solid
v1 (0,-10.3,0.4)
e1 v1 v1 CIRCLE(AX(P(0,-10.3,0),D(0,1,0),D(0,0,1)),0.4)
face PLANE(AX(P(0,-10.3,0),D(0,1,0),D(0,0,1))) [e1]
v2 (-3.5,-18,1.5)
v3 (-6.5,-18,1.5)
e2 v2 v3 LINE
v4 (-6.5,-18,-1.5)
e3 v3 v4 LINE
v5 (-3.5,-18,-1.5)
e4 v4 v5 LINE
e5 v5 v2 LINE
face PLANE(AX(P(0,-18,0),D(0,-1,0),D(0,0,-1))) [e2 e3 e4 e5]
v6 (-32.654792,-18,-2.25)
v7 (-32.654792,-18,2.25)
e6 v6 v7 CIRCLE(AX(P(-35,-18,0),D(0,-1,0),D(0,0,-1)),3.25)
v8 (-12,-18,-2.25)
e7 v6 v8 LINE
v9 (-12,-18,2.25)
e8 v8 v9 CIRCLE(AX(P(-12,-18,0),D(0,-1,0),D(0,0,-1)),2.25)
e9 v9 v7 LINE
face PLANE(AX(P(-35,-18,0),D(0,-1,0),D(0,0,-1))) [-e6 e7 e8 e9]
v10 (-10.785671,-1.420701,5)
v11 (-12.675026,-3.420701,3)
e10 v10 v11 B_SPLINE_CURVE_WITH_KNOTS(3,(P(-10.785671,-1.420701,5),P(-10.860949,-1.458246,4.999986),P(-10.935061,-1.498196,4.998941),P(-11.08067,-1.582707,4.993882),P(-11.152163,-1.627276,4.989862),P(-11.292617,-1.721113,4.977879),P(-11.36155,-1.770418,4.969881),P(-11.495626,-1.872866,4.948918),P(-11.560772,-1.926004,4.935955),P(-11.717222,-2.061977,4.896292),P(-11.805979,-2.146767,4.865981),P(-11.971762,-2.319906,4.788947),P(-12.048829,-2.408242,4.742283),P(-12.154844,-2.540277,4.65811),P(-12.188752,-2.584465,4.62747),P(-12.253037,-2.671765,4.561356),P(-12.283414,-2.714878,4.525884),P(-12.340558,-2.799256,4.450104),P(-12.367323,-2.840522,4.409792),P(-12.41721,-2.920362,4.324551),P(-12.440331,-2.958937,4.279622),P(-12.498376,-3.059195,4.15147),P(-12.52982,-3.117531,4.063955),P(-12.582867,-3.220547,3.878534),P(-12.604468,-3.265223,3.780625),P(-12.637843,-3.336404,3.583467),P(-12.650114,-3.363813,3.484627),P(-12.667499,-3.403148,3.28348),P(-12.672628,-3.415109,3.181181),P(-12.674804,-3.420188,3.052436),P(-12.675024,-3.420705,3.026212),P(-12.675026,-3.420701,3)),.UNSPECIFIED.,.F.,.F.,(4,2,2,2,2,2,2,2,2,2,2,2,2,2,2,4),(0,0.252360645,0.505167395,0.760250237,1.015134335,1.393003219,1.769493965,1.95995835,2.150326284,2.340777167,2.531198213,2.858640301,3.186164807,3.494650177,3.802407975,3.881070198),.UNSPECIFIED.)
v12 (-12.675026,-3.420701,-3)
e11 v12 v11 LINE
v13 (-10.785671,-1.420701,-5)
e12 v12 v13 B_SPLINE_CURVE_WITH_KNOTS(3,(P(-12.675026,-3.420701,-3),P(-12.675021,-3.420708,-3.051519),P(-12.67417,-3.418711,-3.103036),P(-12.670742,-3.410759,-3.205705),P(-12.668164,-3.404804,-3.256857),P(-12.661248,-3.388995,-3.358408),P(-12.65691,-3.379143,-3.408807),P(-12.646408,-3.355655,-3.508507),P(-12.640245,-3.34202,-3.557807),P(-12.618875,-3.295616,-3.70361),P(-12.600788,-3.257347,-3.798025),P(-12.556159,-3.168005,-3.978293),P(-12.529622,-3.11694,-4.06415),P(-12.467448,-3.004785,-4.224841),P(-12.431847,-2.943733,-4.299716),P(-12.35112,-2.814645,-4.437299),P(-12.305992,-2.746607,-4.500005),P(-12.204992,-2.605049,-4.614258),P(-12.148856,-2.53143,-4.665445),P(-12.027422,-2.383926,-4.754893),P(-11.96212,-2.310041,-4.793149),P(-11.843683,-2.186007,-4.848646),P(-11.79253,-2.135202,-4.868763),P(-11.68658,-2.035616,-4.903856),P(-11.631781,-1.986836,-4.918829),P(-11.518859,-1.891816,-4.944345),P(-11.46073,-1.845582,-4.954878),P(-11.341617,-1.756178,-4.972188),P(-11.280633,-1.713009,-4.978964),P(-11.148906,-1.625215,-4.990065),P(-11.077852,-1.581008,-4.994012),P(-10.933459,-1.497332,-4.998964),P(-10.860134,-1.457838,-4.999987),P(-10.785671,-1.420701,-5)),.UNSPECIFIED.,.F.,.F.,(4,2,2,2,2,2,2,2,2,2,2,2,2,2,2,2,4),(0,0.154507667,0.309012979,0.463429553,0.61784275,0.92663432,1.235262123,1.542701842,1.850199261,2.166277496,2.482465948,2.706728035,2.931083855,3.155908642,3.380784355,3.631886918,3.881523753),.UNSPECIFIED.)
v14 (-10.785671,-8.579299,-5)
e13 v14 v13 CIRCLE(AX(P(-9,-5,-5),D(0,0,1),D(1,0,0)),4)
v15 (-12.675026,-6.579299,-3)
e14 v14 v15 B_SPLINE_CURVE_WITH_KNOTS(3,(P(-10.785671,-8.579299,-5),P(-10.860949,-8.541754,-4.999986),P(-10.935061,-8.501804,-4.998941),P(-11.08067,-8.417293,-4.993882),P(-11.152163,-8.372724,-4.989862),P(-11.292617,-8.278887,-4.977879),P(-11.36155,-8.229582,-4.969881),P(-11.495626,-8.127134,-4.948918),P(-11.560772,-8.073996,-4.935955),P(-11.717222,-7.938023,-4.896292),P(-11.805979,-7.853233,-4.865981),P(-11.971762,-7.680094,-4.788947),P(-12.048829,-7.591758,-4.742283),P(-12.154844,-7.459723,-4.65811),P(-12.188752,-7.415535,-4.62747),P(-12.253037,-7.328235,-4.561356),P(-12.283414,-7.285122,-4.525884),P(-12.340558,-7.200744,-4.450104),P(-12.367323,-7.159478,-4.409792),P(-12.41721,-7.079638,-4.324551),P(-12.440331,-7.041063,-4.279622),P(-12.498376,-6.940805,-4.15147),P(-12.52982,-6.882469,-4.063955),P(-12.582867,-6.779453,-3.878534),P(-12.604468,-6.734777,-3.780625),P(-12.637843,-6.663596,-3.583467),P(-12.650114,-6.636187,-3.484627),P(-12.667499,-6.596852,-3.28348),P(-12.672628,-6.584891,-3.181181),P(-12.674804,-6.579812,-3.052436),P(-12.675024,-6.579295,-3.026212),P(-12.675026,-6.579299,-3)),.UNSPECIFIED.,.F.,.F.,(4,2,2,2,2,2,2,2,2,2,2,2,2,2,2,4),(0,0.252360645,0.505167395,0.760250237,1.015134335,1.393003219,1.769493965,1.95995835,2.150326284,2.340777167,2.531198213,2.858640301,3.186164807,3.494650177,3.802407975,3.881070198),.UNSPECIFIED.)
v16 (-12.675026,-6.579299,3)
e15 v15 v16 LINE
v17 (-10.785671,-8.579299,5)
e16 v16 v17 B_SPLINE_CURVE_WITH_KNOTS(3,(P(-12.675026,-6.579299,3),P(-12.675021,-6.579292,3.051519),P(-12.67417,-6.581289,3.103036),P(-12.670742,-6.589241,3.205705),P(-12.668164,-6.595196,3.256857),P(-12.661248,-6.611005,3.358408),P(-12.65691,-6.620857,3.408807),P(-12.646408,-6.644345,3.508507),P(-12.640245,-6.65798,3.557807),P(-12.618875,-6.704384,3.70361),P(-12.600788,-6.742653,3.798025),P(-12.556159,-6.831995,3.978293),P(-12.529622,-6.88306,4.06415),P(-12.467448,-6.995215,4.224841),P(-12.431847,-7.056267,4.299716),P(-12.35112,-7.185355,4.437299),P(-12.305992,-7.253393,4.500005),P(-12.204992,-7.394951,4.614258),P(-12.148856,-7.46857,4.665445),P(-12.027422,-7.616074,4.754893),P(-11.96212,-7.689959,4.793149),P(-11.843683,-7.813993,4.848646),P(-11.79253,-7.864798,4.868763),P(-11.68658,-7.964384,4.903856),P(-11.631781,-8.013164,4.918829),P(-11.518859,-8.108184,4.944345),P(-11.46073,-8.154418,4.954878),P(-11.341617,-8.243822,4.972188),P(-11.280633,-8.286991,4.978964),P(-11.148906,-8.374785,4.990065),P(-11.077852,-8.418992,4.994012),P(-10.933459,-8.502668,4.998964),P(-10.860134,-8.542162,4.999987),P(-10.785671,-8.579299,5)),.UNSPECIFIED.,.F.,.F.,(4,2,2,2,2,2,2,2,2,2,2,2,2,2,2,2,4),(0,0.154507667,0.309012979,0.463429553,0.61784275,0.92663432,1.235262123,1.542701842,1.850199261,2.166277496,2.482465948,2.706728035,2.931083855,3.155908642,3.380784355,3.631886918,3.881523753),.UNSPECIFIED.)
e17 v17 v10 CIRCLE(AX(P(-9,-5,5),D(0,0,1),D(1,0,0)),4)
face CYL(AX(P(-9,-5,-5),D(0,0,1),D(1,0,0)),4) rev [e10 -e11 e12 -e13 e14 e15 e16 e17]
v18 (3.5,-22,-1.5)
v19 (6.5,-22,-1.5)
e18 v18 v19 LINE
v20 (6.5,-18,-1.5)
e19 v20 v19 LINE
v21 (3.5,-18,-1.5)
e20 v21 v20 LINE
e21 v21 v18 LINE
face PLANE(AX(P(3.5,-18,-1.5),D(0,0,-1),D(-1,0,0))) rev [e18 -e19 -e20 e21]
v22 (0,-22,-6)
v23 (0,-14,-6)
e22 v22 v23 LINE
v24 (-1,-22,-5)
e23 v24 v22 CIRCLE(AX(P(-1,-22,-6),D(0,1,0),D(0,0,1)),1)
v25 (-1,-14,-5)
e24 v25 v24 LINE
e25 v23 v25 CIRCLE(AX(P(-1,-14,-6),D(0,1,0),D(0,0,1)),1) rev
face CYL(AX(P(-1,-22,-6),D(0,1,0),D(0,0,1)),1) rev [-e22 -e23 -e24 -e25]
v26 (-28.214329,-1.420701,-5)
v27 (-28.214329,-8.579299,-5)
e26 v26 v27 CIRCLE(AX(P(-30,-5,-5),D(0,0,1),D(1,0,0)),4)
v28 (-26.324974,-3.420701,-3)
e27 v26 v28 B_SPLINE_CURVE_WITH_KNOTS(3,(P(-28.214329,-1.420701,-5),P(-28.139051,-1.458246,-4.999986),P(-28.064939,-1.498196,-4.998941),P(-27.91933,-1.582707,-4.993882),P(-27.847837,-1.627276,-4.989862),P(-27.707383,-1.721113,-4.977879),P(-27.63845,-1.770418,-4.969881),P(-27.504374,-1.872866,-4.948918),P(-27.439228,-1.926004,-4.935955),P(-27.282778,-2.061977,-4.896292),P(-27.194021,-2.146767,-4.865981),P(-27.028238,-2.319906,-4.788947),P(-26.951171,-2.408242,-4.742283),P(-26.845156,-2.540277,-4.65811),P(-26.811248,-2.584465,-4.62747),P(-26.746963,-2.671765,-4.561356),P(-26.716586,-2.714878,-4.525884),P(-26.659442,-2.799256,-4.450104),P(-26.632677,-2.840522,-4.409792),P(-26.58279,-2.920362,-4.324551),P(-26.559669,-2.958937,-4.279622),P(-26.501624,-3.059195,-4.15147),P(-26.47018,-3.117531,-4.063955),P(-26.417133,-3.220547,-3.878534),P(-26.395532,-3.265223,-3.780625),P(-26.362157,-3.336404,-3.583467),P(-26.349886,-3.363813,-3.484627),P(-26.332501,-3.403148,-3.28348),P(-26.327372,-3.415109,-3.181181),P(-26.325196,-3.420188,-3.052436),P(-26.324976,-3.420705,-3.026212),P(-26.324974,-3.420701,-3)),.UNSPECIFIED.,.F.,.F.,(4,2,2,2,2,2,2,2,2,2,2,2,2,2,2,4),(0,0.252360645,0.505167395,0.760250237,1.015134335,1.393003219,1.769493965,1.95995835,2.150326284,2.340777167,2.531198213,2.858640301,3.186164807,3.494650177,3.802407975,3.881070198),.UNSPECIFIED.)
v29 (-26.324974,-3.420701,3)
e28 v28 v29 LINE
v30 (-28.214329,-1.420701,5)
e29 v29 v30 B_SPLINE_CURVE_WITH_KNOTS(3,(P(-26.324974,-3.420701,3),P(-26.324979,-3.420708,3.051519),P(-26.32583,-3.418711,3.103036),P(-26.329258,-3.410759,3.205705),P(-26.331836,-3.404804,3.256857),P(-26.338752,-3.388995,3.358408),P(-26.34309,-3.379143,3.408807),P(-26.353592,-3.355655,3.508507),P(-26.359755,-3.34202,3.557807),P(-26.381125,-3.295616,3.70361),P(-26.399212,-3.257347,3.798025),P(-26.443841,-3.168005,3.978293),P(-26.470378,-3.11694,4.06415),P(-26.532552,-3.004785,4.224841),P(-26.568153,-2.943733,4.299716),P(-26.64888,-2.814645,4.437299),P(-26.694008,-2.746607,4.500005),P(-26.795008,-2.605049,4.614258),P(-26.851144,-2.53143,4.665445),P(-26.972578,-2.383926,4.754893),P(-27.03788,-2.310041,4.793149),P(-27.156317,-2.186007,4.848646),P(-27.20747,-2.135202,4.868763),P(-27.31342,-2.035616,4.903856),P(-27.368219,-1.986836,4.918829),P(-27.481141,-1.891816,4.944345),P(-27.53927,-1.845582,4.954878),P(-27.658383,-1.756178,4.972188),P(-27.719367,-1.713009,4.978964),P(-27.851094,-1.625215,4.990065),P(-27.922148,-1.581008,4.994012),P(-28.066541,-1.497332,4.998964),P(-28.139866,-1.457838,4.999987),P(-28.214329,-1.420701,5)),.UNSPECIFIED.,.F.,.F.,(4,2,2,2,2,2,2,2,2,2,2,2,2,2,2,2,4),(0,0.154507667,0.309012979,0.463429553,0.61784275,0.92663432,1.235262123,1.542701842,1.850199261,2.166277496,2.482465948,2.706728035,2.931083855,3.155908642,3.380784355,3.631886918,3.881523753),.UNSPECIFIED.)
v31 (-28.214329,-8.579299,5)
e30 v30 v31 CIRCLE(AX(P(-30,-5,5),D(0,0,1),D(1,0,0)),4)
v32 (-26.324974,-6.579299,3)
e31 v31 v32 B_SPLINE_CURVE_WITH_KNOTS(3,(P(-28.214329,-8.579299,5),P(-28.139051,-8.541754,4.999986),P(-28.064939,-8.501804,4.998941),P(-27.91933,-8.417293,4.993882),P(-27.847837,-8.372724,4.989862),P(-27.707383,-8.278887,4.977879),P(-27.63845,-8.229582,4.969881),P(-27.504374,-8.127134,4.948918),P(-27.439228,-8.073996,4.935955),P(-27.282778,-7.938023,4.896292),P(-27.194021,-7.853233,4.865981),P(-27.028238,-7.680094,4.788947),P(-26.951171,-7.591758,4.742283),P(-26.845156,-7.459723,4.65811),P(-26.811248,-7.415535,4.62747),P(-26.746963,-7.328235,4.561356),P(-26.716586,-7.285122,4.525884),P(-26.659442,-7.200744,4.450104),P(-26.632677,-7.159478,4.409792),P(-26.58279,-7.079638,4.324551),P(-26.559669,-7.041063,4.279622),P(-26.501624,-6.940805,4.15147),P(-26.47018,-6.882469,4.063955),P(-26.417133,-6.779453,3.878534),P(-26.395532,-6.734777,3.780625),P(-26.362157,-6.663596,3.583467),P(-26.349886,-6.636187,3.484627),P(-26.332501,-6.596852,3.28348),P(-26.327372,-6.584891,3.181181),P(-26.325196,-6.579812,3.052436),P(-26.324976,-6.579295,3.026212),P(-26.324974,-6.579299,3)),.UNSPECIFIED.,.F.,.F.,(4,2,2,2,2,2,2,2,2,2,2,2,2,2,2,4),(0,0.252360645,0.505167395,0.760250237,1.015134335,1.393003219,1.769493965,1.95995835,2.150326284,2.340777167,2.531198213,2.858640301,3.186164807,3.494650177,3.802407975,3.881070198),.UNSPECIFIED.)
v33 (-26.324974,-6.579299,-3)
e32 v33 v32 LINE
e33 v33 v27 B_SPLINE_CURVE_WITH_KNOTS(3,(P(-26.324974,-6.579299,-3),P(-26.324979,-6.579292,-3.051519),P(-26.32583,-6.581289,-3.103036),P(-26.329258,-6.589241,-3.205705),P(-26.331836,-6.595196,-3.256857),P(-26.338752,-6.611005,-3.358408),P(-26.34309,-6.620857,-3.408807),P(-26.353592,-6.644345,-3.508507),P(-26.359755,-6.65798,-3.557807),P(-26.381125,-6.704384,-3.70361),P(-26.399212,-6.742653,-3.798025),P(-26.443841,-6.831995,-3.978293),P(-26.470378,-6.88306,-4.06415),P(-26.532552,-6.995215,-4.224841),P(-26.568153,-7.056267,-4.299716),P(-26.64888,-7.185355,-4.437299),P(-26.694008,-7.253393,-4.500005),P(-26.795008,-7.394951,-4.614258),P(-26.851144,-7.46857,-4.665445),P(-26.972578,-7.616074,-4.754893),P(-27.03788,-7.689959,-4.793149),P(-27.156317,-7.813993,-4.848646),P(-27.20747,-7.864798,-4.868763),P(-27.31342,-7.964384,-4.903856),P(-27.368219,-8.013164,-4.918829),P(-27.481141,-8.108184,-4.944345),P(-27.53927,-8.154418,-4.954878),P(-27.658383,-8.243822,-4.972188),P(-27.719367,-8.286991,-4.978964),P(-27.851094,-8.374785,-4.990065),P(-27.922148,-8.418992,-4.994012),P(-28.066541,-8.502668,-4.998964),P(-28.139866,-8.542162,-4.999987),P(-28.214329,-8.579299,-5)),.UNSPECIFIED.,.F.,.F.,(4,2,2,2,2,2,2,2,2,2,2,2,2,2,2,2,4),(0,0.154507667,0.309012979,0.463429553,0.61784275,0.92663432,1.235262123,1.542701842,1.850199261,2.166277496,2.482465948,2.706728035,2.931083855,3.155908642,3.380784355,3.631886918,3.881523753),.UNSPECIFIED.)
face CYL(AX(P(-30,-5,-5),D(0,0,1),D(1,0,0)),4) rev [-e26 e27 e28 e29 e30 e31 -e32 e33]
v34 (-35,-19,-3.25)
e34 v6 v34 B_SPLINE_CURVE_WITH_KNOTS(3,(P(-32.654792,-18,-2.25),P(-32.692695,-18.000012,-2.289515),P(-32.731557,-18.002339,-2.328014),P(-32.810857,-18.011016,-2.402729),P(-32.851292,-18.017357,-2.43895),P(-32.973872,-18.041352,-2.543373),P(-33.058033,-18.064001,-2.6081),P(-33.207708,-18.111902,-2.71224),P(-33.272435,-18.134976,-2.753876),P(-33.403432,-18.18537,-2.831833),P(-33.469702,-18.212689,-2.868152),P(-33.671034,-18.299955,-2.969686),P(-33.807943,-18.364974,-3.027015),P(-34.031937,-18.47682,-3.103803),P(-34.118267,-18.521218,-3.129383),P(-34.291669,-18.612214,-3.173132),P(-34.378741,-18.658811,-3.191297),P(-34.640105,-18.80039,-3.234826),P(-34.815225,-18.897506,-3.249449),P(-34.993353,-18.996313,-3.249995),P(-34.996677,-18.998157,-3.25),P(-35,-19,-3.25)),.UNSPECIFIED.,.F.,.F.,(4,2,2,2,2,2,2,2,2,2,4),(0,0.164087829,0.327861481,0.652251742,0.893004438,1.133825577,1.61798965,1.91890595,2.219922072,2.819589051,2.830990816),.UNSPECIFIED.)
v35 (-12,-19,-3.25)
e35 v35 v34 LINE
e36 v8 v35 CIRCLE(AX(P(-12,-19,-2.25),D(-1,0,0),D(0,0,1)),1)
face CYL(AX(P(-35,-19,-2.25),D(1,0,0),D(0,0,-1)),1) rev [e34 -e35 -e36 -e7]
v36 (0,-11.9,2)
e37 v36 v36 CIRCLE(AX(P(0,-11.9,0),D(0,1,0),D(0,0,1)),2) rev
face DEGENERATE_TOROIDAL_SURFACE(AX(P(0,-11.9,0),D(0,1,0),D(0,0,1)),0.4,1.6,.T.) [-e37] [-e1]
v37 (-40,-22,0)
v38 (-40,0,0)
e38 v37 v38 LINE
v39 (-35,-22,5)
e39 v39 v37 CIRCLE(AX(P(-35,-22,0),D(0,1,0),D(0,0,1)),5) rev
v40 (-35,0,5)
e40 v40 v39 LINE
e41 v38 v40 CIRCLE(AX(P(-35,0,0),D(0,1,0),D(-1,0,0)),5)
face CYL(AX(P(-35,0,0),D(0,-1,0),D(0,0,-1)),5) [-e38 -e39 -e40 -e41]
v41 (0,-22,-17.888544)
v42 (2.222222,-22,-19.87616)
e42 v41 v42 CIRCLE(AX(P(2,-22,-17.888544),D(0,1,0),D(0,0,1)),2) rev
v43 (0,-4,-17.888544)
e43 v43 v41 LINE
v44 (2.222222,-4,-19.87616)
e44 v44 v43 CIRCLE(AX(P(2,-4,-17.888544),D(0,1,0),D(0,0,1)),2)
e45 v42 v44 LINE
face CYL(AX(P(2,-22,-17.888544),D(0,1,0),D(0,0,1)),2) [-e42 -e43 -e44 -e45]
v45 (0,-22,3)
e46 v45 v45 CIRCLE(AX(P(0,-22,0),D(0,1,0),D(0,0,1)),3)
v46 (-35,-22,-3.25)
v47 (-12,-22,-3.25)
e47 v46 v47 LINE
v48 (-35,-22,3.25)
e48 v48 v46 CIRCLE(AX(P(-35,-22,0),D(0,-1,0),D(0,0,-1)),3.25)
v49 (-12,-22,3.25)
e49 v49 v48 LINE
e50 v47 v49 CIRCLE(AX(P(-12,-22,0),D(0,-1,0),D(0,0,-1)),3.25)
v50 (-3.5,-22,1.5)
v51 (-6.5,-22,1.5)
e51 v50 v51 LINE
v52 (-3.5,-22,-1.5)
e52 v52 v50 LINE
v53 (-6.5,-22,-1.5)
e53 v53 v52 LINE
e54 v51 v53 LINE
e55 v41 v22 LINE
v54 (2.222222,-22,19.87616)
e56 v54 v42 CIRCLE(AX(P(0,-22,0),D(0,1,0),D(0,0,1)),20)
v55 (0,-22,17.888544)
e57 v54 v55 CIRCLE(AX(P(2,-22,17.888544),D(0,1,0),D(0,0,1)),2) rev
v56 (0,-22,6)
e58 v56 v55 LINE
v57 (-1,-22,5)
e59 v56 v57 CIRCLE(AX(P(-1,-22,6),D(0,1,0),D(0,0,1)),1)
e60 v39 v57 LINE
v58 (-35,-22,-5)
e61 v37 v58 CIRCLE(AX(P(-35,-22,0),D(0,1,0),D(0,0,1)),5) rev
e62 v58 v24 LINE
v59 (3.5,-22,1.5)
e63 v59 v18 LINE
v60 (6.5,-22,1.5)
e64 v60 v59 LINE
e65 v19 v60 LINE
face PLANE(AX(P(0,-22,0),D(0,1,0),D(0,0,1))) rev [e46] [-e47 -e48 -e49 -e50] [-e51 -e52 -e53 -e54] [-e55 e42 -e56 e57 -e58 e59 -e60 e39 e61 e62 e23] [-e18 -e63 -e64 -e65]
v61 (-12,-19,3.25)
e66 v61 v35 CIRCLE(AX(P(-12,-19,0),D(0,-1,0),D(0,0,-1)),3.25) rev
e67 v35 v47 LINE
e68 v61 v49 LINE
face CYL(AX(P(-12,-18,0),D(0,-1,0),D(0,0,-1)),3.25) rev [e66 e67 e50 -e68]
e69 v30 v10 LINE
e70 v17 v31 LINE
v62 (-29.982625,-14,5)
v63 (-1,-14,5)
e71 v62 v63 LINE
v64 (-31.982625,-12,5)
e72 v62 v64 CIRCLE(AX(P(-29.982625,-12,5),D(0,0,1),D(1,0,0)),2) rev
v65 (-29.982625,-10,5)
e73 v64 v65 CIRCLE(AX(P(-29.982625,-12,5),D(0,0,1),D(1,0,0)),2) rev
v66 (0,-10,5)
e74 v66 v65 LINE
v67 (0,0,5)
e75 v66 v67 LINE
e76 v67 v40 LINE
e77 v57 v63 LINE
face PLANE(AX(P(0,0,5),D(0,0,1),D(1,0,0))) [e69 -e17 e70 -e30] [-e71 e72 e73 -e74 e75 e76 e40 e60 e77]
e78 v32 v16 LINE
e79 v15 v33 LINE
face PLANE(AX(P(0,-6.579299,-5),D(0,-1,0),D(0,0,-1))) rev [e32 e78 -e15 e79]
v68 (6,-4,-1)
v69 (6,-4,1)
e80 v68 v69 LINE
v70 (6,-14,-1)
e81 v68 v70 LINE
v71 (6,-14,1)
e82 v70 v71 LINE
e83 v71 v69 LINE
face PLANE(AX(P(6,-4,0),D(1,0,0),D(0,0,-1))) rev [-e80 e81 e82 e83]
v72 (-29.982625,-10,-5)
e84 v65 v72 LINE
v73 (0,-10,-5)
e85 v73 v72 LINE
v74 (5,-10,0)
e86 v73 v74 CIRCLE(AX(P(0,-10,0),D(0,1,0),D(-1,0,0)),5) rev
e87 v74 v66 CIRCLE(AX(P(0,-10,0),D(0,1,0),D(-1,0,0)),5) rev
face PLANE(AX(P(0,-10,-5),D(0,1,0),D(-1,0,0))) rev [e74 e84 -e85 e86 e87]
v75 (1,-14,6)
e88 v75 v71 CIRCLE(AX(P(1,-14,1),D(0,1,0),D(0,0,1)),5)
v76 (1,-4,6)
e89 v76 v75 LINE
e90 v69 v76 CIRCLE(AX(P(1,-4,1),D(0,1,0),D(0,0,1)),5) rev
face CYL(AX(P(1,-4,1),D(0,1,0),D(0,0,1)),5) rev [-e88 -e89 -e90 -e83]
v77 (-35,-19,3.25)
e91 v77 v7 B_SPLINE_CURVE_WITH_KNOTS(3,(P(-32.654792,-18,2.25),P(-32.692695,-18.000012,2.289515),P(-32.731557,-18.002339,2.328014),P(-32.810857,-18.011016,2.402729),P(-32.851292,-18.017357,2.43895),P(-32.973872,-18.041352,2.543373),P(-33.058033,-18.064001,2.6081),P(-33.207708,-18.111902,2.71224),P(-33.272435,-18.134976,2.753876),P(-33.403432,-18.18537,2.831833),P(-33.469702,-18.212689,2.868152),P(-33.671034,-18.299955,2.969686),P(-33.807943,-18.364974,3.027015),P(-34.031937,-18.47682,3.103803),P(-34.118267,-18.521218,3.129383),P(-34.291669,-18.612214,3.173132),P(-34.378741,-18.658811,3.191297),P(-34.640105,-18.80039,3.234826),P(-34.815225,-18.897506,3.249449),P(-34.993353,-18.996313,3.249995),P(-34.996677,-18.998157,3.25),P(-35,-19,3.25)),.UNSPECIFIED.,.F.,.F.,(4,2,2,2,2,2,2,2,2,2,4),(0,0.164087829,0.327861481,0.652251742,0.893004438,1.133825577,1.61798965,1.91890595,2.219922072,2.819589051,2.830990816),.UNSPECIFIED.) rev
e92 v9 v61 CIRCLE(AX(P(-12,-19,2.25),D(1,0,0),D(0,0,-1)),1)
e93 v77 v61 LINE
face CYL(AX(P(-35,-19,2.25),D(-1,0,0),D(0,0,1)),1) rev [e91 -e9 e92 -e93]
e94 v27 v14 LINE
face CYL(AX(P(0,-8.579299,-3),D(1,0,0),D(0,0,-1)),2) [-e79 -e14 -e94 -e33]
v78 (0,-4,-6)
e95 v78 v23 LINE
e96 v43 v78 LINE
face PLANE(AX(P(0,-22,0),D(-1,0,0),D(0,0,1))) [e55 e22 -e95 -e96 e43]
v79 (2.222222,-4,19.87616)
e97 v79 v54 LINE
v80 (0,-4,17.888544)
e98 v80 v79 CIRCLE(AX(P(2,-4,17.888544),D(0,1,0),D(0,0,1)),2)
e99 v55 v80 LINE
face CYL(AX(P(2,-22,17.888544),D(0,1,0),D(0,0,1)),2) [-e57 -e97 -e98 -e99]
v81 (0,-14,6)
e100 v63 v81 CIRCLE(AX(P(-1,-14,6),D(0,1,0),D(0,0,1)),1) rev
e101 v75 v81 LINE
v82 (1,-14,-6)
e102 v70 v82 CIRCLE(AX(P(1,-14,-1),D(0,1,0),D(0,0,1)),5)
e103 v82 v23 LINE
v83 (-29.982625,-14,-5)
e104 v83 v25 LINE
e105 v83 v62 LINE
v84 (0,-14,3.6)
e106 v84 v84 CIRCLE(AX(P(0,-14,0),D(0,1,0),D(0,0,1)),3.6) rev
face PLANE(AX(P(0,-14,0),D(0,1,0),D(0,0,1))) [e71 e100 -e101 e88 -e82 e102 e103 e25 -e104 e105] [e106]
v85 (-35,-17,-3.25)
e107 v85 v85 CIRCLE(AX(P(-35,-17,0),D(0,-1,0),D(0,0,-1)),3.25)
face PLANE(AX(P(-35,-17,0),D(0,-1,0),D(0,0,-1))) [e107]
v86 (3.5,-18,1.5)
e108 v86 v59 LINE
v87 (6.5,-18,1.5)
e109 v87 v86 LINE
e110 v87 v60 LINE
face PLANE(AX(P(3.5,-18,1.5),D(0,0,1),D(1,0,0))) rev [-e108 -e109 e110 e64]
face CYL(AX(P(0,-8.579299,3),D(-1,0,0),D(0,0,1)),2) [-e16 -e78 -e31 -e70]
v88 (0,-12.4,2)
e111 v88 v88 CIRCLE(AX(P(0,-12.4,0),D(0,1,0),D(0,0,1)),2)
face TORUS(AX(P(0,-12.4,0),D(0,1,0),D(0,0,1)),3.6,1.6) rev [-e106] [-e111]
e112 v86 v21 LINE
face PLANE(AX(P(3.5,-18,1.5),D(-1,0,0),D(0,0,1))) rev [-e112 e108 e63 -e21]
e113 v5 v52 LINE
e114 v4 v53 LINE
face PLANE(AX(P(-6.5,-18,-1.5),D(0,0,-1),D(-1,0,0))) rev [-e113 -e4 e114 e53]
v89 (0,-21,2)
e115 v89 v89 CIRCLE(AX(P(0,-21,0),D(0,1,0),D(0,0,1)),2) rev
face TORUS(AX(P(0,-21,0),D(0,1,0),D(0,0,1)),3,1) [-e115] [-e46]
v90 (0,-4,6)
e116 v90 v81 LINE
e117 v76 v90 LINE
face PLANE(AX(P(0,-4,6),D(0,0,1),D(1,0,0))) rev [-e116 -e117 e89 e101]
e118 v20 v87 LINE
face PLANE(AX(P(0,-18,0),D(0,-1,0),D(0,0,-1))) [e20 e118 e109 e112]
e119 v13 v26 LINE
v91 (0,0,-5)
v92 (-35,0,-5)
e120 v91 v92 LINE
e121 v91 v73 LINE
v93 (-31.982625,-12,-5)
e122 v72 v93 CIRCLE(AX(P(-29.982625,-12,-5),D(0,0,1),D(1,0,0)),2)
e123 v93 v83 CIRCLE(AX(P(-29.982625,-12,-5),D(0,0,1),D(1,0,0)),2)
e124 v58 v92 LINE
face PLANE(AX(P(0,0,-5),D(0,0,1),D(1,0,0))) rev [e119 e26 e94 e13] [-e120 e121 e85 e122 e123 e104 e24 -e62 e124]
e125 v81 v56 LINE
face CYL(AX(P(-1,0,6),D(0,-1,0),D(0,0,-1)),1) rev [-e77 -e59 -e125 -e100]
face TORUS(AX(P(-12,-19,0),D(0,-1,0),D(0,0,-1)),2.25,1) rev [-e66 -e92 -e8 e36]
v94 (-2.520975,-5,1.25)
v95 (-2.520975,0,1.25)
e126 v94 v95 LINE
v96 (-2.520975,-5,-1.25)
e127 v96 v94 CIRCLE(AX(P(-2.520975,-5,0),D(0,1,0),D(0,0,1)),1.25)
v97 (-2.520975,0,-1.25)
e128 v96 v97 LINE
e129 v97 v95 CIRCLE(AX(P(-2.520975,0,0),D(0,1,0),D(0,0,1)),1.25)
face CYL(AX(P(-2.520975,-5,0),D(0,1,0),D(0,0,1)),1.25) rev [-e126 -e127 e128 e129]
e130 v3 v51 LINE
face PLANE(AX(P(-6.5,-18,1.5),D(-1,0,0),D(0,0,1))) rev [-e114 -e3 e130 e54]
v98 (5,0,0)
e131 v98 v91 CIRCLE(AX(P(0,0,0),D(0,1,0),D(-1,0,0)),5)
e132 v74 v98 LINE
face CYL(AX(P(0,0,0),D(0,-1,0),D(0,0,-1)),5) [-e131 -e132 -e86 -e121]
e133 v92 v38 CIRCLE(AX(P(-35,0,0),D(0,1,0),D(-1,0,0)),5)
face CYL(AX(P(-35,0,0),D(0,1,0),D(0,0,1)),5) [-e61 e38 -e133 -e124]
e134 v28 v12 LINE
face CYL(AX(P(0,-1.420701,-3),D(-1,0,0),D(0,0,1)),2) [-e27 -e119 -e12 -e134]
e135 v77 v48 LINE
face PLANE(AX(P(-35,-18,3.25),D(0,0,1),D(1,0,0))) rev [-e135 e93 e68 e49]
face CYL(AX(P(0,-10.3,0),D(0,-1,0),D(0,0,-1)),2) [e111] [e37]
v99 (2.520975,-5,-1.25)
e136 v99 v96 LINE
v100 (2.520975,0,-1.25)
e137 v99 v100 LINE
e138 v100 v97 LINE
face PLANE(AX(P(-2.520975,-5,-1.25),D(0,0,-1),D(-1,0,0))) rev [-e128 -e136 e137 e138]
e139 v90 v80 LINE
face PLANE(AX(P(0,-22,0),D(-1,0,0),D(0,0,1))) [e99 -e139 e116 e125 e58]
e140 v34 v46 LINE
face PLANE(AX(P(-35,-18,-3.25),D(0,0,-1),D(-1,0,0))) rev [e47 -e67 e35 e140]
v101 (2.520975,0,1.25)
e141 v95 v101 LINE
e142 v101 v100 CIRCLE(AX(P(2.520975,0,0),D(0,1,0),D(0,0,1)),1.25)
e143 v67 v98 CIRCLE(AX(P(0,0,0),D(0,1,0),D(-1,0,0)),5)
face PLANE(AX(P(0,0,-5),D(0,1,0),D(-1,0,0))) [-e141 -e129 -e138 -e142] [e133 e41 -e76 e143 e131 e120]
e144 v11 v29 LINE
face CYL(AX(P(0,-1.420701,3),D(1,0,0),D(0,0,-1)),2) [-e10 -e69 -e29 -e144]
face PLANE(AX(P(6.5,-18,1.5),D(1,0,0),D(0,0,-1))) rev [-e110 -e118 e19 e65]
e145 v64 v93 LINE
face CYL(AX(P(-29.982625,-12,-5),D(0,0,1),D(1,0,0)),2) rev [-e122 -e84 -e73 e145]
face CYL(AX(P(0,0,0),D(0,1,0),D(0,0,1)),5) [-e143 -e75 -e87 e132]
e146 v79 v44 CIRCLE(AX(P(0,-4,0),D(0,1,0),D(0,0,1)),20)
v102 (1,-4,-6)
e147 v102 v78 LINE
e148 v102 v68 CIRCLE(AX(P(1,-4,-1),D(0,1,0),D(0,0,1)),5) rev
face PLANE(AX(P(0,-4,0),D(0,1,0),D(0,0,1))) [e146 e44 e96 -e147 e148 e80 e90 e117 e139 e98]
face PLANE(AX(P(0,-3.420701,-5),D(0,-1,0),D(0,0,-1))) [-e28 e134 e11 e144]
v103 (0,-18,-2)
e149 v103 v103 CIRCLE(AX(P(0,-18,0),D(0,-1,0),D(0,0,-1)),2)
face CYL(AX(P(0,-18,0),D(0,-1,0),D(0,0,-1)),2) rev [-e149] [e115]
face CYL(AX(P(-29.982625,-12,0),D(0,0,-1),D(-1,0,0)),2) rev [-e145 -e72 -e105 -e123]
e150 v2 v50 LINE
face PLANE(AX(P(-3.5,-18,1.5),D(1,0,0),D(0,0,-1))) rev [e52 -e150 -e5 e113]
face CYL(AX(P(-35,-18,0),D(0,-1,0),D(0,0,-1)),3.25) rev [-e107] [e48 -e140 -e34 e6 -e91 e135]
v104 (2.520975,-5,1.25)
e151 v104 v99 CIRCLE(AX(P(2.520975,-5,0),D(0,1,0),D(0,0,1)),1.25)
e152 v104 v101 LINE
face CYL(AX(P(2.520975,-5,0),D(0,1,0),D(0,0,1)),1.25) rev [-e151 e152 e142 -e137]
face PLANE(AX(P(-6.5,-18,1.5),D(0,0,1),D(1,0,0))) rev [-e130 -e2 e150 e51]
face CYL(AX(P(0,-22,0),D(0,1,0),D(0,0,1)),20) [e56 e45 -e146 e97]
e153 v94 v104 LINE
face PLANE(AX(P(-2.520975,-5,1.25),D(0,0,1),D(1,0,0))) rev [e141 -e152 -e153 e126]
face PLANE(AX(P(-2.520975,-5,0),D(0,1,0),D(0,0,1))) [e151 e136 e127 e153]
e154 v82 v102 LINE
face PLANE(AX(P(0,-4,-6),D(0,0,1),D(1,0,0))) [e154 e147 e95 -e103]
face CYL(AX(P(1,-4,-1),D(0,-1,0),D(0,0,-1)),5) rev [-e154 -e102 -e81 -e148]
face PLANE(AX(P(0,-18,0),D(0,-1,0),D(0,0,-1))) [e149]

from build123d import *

# Parameters (mm, degrees)
BOSS_EXTRUDE1_DEPTH      = 5
BOSS_EXTRUDE1_DEPTH_BACK = 5
CUT_EXTRUDE1_DEPTH       = 5
BOSS_EXTRUDE2_START      = -14
SKETCH3_W                = 5.881583951
SKETCH3_H                = 10
BOSS_EXTRUDE2_DEPTH      = 8
BOSS_EXTRUDE3_START      = 10
BOSS_EXTRUDE3_DEPTH      = 10
FILLET2_R                = 5
FILLET3_R                = 2
SKETCH5_R                = 2
SKETCH5_W                = 3
SKETCH5_H                = 3
CUT_EXTRUDE2_DEPTH       = 4
FILLET4_R                = 1
SKETCH6_R                = 3.25
CUT_EXTRUDE3_DEPTH       = 5
BOSS_EXTRUDE4_START      = -14
SKETCH7_R                = 2
BOSS_EXTRUDE4_DEPTH      = 3.7
FILLET5_R                = 1.6


with BuildPart() as part:
    # Sketch1 → Boss-Extrude1 (new, two sides: drawn at the far end of the back side and taken through both)
    with BuildSketch(Plane.XY.offset(-BOSS_EXTRUDE1_DEPTH_BACK)):
        Polygon((5, -10), (5, 0), (0, 0), (-5, 0), (-35, 0), (-40, 0), (-40, -14), (-31.982625312, -14), (-31.982625312, -10), (-5, -10), align=None)
        with BuildLine():
            ThreePointArc((-26.324974154, -6.579298906), (-34, -5), (-26.324974154, -3.420701094))
            Line((-26.324974154, -3.420701094), (-12.675025846, -3.420701094))
            ThreePointArc((-12.675025846, -3.420701094), (-8.193806283, -1.082085798), (-5, -5))
            ThreePointArc((-5, -5), (-8.193806283, -8.917914202), (-12.675025846, -6.579298906))
            Line((-12.675025846, -6.579298906), (-26.324974154, -6.579298906))
        make_face(mode=Mode.SUBTRACT)
    extrude(amount=BOSS_EXTRUDE1_DEPTH + BOSS_EXTRUDE1_DEPTH_BACK)

    # Sketch2 → Cut-Extrude1 (cut)
    with BuildSketch(Plane(origin=(0, 0, 0), x_dir=(1, 0, 0), z_dir=(0, 1, 0))):
        with BuildLine():
            Line((-2.520975228, 1.25), (2.520975228, 1.25))
            ThreePointArc((2.520975228, 1.25), (3.770975228, 0), (2.520975228, -1.25))
            Line((2.520975228, -1.25), (-2.520975228, -1.25))
            ThreePointArc((-2.520975228, -1.25), (-3.770975228, 0), (-2.520975228, 1.25))
        make_face()
    extrude(amount=-CUT_EXTRUDE1_DEPTH, mode=Mode.SUBTRACT)

    # Sketch3 → Boss-Extrude2 (add)
    with BuildSketch(Plane(origin=(0, 0, 0), x_dir=(1, 0, 0), z_dir=(0, 1, 0)).offset(BOSS_EXTRUDE2_START)):
        with BuildLine():
            Line((0, 20), (0, 5))
            Line((0, 5), (5.881583951, 5))
            Line((5.881583951, 5), (5.881583951, -5))
            Line((5.881583951, -5), (0, -5))
            Line((0, -5), (0, -20))
            ThreePointArc((0, -20), (14.142135624, -14.142135624), (20, 0))
            ThreePointArc((20, 0), (14.142135624, 14.142135624), (0, 20))
        make_face()
        with Locations((2.940791976, 0)):
            Rectangle(SKETCH3_W, SKETCH3_H)
        with BuildLine():
            Line((0, 5), (-19.364916731, 5))
            ThreePointArc((-19.364916731, 5), (-20, 0), (-19.364916731, -5))
            Line((-19.364916731, -5), (0, -5))
            Line((0, -5), (0, 5))
        make_face()
        with BuildLine():
            Line((-19.364916731, 5), (-40, 5))
            Line((-40, 5), (-40, -5))
            Line((-40, -5), (-19.364916731, -5))
            ThreePointArc((-19.364916731, -5), (-20, 0), (-19.364916731, 5))
        make_face()
    extrude(amount=-BOSS_EXTRUDE2_DEPTH)

    # Sketch4 → Boss-Extrude3 (add)
    with BuildSketch(Plane(origin=(0, -14, 0), x_dir=(1, 0, 0), z_dir=(0, 1, 0)).offset(BOSS_EXTRUDE3_START)):
        with BuildLine():
            ThreePointArc((20, 0), (14.142135624, 14.142135624), (0, 20))
            Line((0, 20), (0, 6))
            Line((0, 6), (6, 6))
            Line((6, 6), (6, -6))
            Line((6, -6), (0, -6))
            Line((0, -6), (0, -20))
            ThreePointArc((0, -20), (14.142135624, -14.142135624), (20, 0))
        make_face()
    extrude(amount=-BOSS_EXTRUDE3_DEPTH)

    # Fillet2
    fillet2_edges = [part.edges().sort_by_distance(p)[0] for p in [
        (-40, -11, -5),
        (-40, -11, 5),
        (6, -9, 6),
        (6, -9, -6),
        (5, -5, 5),
        (5, -5, -5),
    ]]
    fillet(fillet2_edges, radius=FILLET2_R - 0.0001)  # a hair under: the kernel refuses the full size

    # Fillet3
    fillet3_edges = [part.edges().sort_by_distance(p)[0] for p in [
        (-19.5, -3.420701094, 5),
        (-19.5, -3.420701094, -5),
        (-19.5, -6.579298906, 5),
        (-19.5, -6.579298906, -5),
        (-31.982625312, -10, 0),
        (-31.982625312, -14, 0),
        (0, -13, -20),
        (0, -13, 20),
    ]]
    fillet(fillet3_edges, radius=FILLET3_R - 0.0001)  # a hair under: the kernel refuses the full size

    # Sketch5 → Cut-Extrude2 (cut)
    with BuildSketch(Plane.XZ.offset(22)):
        with Locations(Location((0, 0, 0), (0, 0, 270))):
            Circle(SKETCH5_R)
        with BuildLine():
            Line((-35, 3.25), (-12, 3.25))
            ThreePointArc((-12, 3.25), (-8.75, 0), (-12, -3.25))
            Line((-12, -3.25), (-35, -3.25))
            ThreePointArc((-35, -3.25), (-38.25, 0), (-35, 3.25))
        make_face()
        with Locations((-5, 0)):
            Rectangle(SKETCH5_W, SKETCH5_H)
        with Locations((5, 0)):
            Rectangle(SKETCH5_W, SKETCH5_H)
    extrude(amount=-CUT_EXTRUDE2_DEPTH, mode=Mode.SUBTRACT)

    # Fillet4
    fillet4_edges = [part.edges().sort_by_distance(p)[0] for p in [
        (-23.5, -18, 3.25),
        (-8.75, -18, 0),
        (-23.5, -18, -3.25),
        (-38.25, -18, 0),
        (0, -18, -5),
        (0, -18, 5),
        (0, -22, 2),
    ]]
    fillet(fillet4_edges, radius=FILLET4_R)

    # Sketch6 → Cut-Extrude3 (cut)
    with BuildSketch(Plane.XZ.offset(22)):
        with Locations(Location((-35, 0, 0), (0, 0, 270))):
            Circle(SKETCH6_R)
    extrude(amount=-CUT_EXTRUDE3_DEPTH, mode=Mode.SUBTRACT)

    # Sketch7 → Boss-Extrude4 (add)
    with BuildSketch(Plane(origin=(0, 0, 0), x_dir=(1, 0, 0), z_dir=(0, 1, 0)).offset(BOSS_EXTRUDE4_START)):
        with Locations(Location((0, 0, 0), (0, 0, 90))):
            Circle(SKETCH7_R)
    extrude(amount=BOSS_EXTRUDE4_DEPTH)

    # Fillet5
    fillet5_edges = [part.edges().sort_by_distance(p)[0] for p in [
        (0, -14, 2),
        (0, -10.3, 2),
    ]]
    fillet(fillet5_edges, radius=FILLET5_R)


solid = part.part
